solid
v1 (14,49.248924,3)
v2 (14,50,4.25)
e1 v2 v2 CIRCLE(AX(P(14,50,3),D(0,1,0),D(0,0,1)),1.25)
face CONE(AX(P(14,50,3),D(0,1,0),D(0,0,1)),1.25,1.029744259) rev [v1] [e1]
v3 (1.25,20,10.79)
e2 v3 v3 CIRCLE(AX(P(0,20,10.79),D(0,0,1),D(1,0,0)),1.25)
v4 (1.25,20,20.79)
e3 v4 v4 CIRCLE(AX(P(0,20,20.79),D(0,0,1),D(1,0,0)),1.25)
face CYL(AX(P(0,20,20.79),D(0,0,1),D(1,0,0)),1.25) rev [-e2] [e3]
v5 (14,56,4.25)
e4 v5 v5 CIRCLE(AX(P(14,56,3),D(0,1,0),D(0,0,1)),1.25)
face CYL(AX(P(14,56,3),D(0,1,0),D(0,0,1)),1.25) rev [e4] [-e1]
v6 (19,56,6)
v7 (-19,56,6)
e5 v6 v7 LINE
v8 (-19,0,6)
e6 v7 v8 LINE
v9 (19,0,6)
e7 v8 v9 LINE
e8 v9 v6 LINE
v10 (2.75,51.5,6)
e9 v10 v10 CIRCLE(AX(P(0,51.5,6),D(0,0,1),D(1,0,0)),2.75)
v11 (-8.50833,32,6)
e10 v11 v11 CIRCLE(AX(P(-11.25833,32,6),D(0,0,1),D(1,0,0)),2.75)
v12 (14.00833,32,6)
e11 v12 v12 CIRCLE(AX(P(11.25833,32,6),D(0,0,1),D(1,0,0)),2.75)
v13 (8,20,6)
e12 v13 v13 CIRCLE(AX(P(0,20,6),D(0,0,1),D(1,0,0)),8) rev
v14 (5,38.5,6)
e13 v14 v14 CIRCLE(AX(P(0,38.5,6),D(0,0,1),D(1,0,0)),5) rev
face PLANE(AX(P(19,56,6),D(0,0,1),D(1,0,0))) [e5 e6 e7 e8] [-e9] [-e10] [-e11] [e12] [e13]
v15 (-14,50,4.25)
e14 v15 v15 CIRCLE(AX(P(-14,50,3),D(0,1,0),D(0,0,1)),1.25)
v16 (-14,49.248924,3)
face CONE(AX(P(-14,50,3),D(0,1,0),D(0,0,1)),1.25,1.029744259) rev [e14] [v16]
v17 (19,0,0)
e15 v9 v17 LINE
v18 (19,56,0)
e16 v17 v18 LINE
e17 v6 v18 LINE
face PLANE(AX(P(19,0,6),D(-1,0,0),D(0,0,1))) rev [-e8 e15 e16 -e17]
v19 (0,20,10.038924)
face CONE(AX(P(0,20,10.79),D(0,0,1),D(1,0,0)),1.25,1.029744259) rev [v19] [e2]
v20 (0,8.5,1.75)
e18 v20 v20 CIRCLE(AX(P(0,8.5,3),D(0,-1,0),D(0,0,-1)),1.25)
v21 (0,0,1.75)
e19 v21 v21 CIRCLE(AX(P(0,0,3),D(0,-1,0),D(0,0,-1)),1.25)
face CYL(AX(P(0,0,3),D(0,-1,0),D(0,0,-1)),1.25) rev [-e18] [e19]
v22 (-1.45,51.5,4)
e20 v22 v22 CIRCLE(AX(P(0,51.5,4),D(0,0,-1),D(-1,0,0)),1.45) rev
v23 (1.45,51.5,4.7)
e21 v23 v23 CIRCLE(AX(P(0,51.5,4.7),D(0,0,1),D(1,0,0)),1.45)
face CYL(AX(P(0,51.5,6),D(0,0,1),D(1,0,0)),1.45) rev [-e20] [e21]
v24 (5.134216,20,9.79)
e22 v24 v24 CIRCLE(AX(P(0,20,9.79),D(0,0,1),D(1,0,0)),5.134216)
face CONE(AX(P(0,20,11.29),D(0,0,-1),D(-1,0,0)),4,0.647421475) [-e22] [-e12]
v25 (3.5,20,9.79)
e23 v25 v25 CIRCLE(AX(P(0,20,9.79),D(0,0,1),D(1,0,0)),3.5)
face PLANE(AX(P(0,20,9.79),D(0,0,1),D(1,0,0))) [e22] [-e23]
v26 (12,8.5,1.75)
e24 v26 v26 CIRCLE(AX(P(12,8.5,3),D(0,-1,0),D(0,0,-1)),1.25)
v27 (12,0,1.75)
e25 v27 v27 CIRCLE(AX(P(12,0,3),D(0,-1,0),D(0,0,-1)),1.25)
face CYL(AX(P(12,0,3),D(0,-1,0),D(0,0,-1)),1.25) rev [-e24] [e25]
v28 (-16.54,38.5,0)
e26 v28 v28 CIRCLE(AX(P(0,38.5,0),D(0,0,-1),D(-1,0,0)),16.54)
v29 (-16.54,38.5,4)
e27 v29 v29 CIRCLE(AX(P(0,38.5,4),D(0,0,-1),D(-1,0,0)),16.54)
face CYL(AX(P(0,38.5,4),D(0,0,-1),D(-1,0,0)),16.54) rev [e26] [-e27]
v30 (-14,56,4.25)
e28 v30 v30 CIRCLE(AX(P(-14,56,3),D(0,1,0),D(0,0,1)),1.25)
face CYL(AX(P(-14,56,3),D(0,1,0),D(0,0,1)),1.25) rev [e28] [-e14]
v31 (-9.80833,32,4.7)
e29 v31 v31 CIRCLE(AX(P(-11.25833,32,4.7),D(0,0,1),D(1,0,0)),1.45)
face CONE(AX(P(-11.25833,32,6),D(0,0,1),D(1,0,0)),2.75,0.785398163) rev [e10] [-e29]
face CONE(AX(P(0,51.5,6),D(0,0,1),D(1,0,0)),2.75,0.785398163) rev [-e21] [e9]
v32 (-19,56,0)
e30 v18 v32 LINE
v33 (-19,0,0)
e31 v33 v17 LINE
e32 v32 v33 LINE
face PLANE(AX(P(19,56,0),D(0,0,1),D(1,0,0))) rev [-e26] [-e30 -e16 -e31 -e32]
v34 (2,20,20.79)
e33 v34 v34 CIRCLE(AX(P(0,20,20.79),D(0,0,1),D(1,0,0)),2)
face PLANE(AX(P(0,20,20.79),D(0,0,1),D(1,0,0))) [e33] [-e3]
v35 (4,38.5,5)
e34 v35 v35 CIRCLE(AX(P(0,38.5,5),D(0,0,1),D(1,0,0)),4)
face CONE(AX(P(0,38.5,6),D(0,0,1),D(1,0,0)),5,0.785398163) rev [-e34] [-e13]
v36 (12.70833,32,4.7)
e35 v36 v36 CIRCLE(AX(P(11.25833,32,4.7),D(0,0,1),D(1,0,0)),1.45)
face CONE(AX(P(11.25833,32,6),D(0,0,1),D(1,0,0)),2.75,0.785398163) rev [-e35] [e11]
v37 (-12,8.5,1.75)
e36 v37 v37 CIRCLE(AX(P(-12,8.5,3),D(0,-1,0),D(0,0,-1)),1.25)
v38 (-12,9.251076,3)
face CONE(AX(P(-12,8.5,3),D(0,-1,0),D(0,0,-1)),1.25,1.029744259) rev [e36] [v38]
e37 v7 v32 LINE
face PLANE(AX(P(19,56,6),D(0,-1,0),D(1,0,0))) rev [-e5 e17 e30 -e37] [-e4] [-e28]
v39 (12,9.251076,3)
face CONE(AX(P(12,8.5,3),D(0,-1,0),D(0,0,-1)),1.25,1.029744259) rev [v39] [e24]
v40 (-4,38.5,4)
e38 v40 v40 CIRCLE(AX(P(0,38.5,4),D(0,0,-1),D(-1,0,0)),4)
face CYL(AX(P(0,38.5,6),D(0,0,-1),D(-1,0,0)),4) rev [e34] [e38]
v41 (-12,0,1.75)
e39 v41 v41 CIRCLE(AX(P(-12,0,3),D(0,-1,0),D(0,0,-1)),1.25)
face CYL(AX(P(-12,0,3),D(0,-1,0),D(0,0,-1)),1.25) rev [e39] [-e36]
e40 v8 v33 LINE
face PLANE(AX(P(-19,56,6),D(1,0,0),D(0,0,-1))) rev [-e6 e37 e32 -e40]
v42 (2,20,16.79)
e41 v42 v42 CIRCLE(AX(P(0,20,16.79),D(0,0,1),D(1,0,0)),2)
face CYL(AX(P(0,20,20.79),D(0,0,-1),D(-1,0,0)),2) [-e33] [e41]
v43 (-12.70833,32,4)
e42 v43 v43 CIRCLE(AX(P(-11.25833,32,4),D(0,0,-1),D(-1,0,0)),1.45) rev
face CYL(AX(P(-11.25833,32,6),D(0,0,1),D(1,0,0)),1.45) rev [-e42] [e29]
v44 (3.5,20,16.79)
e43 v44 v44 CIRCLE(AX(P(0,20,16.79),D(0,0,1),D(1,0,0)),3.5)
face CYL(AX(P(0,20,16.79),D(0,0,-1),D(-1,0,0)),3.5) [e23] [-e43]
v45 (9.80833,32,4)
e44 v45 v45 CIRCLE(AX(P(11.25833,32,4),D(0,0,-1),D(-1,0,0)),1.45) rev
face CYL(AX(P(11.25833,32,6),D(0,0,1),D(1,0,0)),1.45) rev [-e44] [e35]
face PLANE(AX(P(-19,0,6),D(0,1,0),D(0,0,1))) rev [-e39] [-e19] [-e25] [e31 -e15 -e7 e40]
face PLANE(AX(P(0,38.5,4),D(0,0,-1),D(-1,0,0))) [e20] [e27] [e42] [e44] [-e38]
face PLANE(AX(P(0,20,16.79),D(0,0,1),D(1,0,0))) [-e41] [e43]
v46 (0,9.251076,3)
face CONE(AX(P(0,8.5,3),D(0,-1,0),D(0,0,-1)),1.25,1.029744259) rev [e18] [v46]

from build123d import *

# Parameters (mm, degrees)
ESBO_O1_W                                            = 38
ESBO_O1_H                                            = 56
ESBO_O1_R                                            = 4
RESSALTO_EXTRUS_O1_DEPTH                             = 6
ESBO_O6_R                                            = 16.54
CORTE_EXTRUS_O5_DEPTH                                = 4
ESBO_O7_R                                            = 4
ESBO_O7_R_2                                          = 1.25
CORTE_EXTRUS_O6_DEPTH                                = 60.270566051
ESCAREADO_PARA_PARAFUSO_DE_M_QUINA_COM_C_D           = 2.9
ESCAREADO_PARA_PARAFUSO_DE_M_QUINA_COM_C_CSINK_D     = 5.5
ESCAREADO_PARA_PARAFUSO_DE_M_QUINA_COM_C_CSINK_ANGLE = 90
RESSALTO_EXTRUS_O2_DEPTH                             = 4
RESSALTO_EXTRUS_O3_DEPTH                             = 5.79
ESBO_O17_R                                           = 3.5
RESSALTO_EXTRUS_O4_DEPTH                             = 7
ESBO_O18_R                                           = 2
RESSALTO_EXTRUS_O5_DEPTH                             = 4
CHANFRO1_SIZE                                        = 4
CHANFRO1_SIZE_2                                      = 5.29
FURO_ROSCADO_DE_M3X0_51_D                            = 2.5
FURO_ROSCADO_DE_M3X0_51_DEPTH                        = 10
FURO_ROSCADO_DE_M3X0_51_TIP                          = 0.751075774
FURO_ROSCADO_DE_M3X0_52_D                            = 2.5
FURO_ROSCADO_DE_M3X0_52_DEPTH                        = 8.5
FURO_ROSCADO_DE_M3X0_52_TIP                          = 0.751075774
FURO_ROSCADO_DE_M3X0_53_D                            = 2.5
FURO_ROSCADO_DE_M3X0_53_DEPTH                        = 6
FURO_ROSCADO_DE_M3X0_53_TIP                          = 0.751075774
CHANFRO2_SIZE                                        = 1


with BuildPart() as part:
    # Esboço1 → Ressalto-extrusão1 (new body)
    with BuildSketch(Plane.XY):
        with Locations((0, 28)):
            Rectangle(ESBO_O1_W, ESBO_O1_H)
        with Locations((0, 20)):
            Circle(ESBO_O1_R, mode=Mode.SUBTRACT)
    extrude(amount=RESSALTO_EXTRUS_O1_DEPTH)

    # Esboço6 → Corte-extrusão5 (cut)
    with BuildSketch(Plane(origin=(0, 0, 0), x_dir=(-1, 0, 0), z_dir=(0, 0, -1))):
        with Locations((0, 38.5)):
            Circle(ESBO_O6_R)
    extrude(amount=-CORTE_EXTRUS_O5_DEPTH, mode=Mode.SUBTRACT)

    # Esboço7 → Corte-extrusão6 (cut, through all)
    with BuildSketch(Plane(origin=(0, 0, 4), x_dir=(-1, 0, 0), z_dir=(0, 0, -1))):
        with Locations((0, 38.5)):
            Circle(ESBO_O7_R)
        with Locations((11.258330249, 32)):
            Circle(ESBO_O7_R_2)
        with Locations((-11.258330249, 32)):
            Circle(ESBO_O7_R_2)
        with Locations((0, 51.5)):
            Circle(ESBO_O7_R_2)
    extrude(amount=-CORTE_EXTRUS_O6_DEPTH, mode=Mode.SUBTRACT)

    # Escareado para parafuso de máquina com cabeça chata de M2.51 (through all)
    with Locations(Plane.XY.offset(6)):
        with Locations((0, 51.5), (11.258330249, 32), (-11.258330249, 32)):
            CounterSinkHole(ESCAREADO_PARA_PARAFUSO_DE_M_QUINA_COM_C_D / 2, ESCAREADO_PARA_PARAFUSO_DE_M_QUINA_COM_C_CSINK_D / 2, counter_sink_angle=ESCAREADO_PARA_PARAFUSO_DE_M_QUINA_COM_C_CSINK_ANGLE)

    # Esboço15 → Ressalto-extrusão2 (add)
    with BuildSketch(Plane(origin=(0, 0, 0), x_dir=(-1, 0, 0), z_dir=(0, 0, -1))):
        with BuildLine():
            ThreePointArc((-3.280592218, 22.288605405), (0, 16), (3.280592218, 22.288605405))
            ThreePointArc((3.280592218, 22.288605405), (0, 21.96), (-3.280592218, 22.288605405))
        make_face()
    extrude(amount=-RESSALTO_EXTRUS_O2_DEPTH)

    # Esboço16 → Ressalto-extrusão3 (add)
    with BuildSketch(Plane.XY.offset(4)):
        with BuildLine():
            ThreePointArc((-3.280592218, 22.288605405), (0, 16), (3.280592218, 22.288605405))
            ThreePointArc((3.280592218, 22.288605405), (0, 24), (-3.280592218, 22.288605405))
        make_face()
    extrude(amount=RESSALTO_EXTRUS_O3_DEPTH)

    # Esboço17 → Ressalto-extrusão4 (add)
    with BuildSketch(Plane.XY.offset(9.79)):
        with Locations((0, 20)):
            Circle(ESBO_O17_R)
    extrude(amount=RESSALTO_EXTRUS_O4_DEPTH)

    # Esboço18 → Ressalto-extrusão5 (add)
    with BuildSketch(Plane.XY.offset(16.79)):
        with Locations((0, 20)):
            Circle(ESBO_O18_R)
    extrude(amount=RESSALTO_EXTRUS_O5_DEPTH)

    # Chanfro1
    # the kernel refuses this chamfer: 5.29, 4 mm, written as the material it adds along each edge
    with BuildSketch(Plane(origin=(0, 20, 6), x_dir=(0.8201480544065356, 0.5721513513513485, 0), z_dir=(-0.5721513513513485, 0.8201480544065356, 0))) as chanfro1_piece_1_section:
        Polygon((4 + CHANFRO1_SIZE, 0), (4, -CHANFRO1_SIZE_2), (4, 0), align=None)
    chanfro1_piece_1 = revolve(axis=Axis((0, 20, 6), (0, 0, -1)), mode=Mode.PRIVATE)
    chanfro1_piece_1 = split(chanfro1_piece_1, bisect_by=Plane(origin=(-5.391672126, 16.23866389, 9.79), z_dir=(0, 0, -1)), keep=Keep.TOP, mode=Mode.PRIVATE)
    add(chanfro1_piece_1)

    # Furo roscado de M3x0.51
    with Locations(Plane.XY.offset(20.79)):
        with Locations((0, 20)):
            Hole(FURO_ROSCADO_DE_M3X0_51_D / 2, depth=FURO_ROSCADO_DE_M3X0_51_DEPTH)
            with Locations((0, 0, -(FURO_ROSCADO_DE_M3X0_51_DEPTH + FURO_ROSCADO_DE_M3X0_51_TIP / 2))):  # 118° drill point
                Cone(0, FURO_ROSCADO_DE_M3X0_51_D / 2, FURO_ROSCADO_DE_M3X0_51_TIP, mode=Mode.SUBTRACT)

    # Furo roscado de M3x0.52
    with Locations(Plane(origin=(0, 0, 0), x_dir=(-1, 0, 0), z_dir=(0, -1, 0))):
        with Locations((12, -3), (0, -3), (-12, -3)):
            Hole(FURO_ROSCADO_DE_M3X0_52_D / 2, depth=FURO_ROSCADO_DE_M3X0_52_DEPTH)
            with Locations((0, 0, -(FURO_ROSCADO_DE_M3X0_52_DEPTH + FURO_ROSCADO_DE_M3X0_52_TIP / 2))):  # 118° drill point
                Cone(0, FURO_ROSCADO_DE_M3X0_52_D / 2, FURO_ROSCADO_DE_M3X0_52_TIP, mode=Mode.SUBTRACT)

    # Furo roscado de M3x0.53
    with Locations(Plane(origin=(0, 56, 0), x_dir=(1, 0, 0), z_dir=(0, 1, 0))):
        with Locations((-14, -3), (14, -3)):
            Hole(FURO_ROSCADO_DE_M3X0_53_D / 2, depth=FURO_ROSCADO_DE_M3X0_53_DEPTH)
            with Locations((0, 0, -(FURO_ROSCADO_DE_M3X0_53_DEPTH + FURO_ROSCADO_DE_M3X0_53_TIP / 2))):  # 118° drill point
                Cone(0, FURO_ROSCADO_DE_M3X0_53_D / 2, FURO_ROSCADO_DE_M3X0_53_TIP, mode=Mode.SUBTRACT)

    # Chanfro2
    chanfro2_edges = [part.edges().sort_by_distance(p)[0] for p in [
        (4, 38.5, 6),
    ]]
    chamfer(chanfro2_edges, length=CHANFRO2_SIZE)


solid = part.part
